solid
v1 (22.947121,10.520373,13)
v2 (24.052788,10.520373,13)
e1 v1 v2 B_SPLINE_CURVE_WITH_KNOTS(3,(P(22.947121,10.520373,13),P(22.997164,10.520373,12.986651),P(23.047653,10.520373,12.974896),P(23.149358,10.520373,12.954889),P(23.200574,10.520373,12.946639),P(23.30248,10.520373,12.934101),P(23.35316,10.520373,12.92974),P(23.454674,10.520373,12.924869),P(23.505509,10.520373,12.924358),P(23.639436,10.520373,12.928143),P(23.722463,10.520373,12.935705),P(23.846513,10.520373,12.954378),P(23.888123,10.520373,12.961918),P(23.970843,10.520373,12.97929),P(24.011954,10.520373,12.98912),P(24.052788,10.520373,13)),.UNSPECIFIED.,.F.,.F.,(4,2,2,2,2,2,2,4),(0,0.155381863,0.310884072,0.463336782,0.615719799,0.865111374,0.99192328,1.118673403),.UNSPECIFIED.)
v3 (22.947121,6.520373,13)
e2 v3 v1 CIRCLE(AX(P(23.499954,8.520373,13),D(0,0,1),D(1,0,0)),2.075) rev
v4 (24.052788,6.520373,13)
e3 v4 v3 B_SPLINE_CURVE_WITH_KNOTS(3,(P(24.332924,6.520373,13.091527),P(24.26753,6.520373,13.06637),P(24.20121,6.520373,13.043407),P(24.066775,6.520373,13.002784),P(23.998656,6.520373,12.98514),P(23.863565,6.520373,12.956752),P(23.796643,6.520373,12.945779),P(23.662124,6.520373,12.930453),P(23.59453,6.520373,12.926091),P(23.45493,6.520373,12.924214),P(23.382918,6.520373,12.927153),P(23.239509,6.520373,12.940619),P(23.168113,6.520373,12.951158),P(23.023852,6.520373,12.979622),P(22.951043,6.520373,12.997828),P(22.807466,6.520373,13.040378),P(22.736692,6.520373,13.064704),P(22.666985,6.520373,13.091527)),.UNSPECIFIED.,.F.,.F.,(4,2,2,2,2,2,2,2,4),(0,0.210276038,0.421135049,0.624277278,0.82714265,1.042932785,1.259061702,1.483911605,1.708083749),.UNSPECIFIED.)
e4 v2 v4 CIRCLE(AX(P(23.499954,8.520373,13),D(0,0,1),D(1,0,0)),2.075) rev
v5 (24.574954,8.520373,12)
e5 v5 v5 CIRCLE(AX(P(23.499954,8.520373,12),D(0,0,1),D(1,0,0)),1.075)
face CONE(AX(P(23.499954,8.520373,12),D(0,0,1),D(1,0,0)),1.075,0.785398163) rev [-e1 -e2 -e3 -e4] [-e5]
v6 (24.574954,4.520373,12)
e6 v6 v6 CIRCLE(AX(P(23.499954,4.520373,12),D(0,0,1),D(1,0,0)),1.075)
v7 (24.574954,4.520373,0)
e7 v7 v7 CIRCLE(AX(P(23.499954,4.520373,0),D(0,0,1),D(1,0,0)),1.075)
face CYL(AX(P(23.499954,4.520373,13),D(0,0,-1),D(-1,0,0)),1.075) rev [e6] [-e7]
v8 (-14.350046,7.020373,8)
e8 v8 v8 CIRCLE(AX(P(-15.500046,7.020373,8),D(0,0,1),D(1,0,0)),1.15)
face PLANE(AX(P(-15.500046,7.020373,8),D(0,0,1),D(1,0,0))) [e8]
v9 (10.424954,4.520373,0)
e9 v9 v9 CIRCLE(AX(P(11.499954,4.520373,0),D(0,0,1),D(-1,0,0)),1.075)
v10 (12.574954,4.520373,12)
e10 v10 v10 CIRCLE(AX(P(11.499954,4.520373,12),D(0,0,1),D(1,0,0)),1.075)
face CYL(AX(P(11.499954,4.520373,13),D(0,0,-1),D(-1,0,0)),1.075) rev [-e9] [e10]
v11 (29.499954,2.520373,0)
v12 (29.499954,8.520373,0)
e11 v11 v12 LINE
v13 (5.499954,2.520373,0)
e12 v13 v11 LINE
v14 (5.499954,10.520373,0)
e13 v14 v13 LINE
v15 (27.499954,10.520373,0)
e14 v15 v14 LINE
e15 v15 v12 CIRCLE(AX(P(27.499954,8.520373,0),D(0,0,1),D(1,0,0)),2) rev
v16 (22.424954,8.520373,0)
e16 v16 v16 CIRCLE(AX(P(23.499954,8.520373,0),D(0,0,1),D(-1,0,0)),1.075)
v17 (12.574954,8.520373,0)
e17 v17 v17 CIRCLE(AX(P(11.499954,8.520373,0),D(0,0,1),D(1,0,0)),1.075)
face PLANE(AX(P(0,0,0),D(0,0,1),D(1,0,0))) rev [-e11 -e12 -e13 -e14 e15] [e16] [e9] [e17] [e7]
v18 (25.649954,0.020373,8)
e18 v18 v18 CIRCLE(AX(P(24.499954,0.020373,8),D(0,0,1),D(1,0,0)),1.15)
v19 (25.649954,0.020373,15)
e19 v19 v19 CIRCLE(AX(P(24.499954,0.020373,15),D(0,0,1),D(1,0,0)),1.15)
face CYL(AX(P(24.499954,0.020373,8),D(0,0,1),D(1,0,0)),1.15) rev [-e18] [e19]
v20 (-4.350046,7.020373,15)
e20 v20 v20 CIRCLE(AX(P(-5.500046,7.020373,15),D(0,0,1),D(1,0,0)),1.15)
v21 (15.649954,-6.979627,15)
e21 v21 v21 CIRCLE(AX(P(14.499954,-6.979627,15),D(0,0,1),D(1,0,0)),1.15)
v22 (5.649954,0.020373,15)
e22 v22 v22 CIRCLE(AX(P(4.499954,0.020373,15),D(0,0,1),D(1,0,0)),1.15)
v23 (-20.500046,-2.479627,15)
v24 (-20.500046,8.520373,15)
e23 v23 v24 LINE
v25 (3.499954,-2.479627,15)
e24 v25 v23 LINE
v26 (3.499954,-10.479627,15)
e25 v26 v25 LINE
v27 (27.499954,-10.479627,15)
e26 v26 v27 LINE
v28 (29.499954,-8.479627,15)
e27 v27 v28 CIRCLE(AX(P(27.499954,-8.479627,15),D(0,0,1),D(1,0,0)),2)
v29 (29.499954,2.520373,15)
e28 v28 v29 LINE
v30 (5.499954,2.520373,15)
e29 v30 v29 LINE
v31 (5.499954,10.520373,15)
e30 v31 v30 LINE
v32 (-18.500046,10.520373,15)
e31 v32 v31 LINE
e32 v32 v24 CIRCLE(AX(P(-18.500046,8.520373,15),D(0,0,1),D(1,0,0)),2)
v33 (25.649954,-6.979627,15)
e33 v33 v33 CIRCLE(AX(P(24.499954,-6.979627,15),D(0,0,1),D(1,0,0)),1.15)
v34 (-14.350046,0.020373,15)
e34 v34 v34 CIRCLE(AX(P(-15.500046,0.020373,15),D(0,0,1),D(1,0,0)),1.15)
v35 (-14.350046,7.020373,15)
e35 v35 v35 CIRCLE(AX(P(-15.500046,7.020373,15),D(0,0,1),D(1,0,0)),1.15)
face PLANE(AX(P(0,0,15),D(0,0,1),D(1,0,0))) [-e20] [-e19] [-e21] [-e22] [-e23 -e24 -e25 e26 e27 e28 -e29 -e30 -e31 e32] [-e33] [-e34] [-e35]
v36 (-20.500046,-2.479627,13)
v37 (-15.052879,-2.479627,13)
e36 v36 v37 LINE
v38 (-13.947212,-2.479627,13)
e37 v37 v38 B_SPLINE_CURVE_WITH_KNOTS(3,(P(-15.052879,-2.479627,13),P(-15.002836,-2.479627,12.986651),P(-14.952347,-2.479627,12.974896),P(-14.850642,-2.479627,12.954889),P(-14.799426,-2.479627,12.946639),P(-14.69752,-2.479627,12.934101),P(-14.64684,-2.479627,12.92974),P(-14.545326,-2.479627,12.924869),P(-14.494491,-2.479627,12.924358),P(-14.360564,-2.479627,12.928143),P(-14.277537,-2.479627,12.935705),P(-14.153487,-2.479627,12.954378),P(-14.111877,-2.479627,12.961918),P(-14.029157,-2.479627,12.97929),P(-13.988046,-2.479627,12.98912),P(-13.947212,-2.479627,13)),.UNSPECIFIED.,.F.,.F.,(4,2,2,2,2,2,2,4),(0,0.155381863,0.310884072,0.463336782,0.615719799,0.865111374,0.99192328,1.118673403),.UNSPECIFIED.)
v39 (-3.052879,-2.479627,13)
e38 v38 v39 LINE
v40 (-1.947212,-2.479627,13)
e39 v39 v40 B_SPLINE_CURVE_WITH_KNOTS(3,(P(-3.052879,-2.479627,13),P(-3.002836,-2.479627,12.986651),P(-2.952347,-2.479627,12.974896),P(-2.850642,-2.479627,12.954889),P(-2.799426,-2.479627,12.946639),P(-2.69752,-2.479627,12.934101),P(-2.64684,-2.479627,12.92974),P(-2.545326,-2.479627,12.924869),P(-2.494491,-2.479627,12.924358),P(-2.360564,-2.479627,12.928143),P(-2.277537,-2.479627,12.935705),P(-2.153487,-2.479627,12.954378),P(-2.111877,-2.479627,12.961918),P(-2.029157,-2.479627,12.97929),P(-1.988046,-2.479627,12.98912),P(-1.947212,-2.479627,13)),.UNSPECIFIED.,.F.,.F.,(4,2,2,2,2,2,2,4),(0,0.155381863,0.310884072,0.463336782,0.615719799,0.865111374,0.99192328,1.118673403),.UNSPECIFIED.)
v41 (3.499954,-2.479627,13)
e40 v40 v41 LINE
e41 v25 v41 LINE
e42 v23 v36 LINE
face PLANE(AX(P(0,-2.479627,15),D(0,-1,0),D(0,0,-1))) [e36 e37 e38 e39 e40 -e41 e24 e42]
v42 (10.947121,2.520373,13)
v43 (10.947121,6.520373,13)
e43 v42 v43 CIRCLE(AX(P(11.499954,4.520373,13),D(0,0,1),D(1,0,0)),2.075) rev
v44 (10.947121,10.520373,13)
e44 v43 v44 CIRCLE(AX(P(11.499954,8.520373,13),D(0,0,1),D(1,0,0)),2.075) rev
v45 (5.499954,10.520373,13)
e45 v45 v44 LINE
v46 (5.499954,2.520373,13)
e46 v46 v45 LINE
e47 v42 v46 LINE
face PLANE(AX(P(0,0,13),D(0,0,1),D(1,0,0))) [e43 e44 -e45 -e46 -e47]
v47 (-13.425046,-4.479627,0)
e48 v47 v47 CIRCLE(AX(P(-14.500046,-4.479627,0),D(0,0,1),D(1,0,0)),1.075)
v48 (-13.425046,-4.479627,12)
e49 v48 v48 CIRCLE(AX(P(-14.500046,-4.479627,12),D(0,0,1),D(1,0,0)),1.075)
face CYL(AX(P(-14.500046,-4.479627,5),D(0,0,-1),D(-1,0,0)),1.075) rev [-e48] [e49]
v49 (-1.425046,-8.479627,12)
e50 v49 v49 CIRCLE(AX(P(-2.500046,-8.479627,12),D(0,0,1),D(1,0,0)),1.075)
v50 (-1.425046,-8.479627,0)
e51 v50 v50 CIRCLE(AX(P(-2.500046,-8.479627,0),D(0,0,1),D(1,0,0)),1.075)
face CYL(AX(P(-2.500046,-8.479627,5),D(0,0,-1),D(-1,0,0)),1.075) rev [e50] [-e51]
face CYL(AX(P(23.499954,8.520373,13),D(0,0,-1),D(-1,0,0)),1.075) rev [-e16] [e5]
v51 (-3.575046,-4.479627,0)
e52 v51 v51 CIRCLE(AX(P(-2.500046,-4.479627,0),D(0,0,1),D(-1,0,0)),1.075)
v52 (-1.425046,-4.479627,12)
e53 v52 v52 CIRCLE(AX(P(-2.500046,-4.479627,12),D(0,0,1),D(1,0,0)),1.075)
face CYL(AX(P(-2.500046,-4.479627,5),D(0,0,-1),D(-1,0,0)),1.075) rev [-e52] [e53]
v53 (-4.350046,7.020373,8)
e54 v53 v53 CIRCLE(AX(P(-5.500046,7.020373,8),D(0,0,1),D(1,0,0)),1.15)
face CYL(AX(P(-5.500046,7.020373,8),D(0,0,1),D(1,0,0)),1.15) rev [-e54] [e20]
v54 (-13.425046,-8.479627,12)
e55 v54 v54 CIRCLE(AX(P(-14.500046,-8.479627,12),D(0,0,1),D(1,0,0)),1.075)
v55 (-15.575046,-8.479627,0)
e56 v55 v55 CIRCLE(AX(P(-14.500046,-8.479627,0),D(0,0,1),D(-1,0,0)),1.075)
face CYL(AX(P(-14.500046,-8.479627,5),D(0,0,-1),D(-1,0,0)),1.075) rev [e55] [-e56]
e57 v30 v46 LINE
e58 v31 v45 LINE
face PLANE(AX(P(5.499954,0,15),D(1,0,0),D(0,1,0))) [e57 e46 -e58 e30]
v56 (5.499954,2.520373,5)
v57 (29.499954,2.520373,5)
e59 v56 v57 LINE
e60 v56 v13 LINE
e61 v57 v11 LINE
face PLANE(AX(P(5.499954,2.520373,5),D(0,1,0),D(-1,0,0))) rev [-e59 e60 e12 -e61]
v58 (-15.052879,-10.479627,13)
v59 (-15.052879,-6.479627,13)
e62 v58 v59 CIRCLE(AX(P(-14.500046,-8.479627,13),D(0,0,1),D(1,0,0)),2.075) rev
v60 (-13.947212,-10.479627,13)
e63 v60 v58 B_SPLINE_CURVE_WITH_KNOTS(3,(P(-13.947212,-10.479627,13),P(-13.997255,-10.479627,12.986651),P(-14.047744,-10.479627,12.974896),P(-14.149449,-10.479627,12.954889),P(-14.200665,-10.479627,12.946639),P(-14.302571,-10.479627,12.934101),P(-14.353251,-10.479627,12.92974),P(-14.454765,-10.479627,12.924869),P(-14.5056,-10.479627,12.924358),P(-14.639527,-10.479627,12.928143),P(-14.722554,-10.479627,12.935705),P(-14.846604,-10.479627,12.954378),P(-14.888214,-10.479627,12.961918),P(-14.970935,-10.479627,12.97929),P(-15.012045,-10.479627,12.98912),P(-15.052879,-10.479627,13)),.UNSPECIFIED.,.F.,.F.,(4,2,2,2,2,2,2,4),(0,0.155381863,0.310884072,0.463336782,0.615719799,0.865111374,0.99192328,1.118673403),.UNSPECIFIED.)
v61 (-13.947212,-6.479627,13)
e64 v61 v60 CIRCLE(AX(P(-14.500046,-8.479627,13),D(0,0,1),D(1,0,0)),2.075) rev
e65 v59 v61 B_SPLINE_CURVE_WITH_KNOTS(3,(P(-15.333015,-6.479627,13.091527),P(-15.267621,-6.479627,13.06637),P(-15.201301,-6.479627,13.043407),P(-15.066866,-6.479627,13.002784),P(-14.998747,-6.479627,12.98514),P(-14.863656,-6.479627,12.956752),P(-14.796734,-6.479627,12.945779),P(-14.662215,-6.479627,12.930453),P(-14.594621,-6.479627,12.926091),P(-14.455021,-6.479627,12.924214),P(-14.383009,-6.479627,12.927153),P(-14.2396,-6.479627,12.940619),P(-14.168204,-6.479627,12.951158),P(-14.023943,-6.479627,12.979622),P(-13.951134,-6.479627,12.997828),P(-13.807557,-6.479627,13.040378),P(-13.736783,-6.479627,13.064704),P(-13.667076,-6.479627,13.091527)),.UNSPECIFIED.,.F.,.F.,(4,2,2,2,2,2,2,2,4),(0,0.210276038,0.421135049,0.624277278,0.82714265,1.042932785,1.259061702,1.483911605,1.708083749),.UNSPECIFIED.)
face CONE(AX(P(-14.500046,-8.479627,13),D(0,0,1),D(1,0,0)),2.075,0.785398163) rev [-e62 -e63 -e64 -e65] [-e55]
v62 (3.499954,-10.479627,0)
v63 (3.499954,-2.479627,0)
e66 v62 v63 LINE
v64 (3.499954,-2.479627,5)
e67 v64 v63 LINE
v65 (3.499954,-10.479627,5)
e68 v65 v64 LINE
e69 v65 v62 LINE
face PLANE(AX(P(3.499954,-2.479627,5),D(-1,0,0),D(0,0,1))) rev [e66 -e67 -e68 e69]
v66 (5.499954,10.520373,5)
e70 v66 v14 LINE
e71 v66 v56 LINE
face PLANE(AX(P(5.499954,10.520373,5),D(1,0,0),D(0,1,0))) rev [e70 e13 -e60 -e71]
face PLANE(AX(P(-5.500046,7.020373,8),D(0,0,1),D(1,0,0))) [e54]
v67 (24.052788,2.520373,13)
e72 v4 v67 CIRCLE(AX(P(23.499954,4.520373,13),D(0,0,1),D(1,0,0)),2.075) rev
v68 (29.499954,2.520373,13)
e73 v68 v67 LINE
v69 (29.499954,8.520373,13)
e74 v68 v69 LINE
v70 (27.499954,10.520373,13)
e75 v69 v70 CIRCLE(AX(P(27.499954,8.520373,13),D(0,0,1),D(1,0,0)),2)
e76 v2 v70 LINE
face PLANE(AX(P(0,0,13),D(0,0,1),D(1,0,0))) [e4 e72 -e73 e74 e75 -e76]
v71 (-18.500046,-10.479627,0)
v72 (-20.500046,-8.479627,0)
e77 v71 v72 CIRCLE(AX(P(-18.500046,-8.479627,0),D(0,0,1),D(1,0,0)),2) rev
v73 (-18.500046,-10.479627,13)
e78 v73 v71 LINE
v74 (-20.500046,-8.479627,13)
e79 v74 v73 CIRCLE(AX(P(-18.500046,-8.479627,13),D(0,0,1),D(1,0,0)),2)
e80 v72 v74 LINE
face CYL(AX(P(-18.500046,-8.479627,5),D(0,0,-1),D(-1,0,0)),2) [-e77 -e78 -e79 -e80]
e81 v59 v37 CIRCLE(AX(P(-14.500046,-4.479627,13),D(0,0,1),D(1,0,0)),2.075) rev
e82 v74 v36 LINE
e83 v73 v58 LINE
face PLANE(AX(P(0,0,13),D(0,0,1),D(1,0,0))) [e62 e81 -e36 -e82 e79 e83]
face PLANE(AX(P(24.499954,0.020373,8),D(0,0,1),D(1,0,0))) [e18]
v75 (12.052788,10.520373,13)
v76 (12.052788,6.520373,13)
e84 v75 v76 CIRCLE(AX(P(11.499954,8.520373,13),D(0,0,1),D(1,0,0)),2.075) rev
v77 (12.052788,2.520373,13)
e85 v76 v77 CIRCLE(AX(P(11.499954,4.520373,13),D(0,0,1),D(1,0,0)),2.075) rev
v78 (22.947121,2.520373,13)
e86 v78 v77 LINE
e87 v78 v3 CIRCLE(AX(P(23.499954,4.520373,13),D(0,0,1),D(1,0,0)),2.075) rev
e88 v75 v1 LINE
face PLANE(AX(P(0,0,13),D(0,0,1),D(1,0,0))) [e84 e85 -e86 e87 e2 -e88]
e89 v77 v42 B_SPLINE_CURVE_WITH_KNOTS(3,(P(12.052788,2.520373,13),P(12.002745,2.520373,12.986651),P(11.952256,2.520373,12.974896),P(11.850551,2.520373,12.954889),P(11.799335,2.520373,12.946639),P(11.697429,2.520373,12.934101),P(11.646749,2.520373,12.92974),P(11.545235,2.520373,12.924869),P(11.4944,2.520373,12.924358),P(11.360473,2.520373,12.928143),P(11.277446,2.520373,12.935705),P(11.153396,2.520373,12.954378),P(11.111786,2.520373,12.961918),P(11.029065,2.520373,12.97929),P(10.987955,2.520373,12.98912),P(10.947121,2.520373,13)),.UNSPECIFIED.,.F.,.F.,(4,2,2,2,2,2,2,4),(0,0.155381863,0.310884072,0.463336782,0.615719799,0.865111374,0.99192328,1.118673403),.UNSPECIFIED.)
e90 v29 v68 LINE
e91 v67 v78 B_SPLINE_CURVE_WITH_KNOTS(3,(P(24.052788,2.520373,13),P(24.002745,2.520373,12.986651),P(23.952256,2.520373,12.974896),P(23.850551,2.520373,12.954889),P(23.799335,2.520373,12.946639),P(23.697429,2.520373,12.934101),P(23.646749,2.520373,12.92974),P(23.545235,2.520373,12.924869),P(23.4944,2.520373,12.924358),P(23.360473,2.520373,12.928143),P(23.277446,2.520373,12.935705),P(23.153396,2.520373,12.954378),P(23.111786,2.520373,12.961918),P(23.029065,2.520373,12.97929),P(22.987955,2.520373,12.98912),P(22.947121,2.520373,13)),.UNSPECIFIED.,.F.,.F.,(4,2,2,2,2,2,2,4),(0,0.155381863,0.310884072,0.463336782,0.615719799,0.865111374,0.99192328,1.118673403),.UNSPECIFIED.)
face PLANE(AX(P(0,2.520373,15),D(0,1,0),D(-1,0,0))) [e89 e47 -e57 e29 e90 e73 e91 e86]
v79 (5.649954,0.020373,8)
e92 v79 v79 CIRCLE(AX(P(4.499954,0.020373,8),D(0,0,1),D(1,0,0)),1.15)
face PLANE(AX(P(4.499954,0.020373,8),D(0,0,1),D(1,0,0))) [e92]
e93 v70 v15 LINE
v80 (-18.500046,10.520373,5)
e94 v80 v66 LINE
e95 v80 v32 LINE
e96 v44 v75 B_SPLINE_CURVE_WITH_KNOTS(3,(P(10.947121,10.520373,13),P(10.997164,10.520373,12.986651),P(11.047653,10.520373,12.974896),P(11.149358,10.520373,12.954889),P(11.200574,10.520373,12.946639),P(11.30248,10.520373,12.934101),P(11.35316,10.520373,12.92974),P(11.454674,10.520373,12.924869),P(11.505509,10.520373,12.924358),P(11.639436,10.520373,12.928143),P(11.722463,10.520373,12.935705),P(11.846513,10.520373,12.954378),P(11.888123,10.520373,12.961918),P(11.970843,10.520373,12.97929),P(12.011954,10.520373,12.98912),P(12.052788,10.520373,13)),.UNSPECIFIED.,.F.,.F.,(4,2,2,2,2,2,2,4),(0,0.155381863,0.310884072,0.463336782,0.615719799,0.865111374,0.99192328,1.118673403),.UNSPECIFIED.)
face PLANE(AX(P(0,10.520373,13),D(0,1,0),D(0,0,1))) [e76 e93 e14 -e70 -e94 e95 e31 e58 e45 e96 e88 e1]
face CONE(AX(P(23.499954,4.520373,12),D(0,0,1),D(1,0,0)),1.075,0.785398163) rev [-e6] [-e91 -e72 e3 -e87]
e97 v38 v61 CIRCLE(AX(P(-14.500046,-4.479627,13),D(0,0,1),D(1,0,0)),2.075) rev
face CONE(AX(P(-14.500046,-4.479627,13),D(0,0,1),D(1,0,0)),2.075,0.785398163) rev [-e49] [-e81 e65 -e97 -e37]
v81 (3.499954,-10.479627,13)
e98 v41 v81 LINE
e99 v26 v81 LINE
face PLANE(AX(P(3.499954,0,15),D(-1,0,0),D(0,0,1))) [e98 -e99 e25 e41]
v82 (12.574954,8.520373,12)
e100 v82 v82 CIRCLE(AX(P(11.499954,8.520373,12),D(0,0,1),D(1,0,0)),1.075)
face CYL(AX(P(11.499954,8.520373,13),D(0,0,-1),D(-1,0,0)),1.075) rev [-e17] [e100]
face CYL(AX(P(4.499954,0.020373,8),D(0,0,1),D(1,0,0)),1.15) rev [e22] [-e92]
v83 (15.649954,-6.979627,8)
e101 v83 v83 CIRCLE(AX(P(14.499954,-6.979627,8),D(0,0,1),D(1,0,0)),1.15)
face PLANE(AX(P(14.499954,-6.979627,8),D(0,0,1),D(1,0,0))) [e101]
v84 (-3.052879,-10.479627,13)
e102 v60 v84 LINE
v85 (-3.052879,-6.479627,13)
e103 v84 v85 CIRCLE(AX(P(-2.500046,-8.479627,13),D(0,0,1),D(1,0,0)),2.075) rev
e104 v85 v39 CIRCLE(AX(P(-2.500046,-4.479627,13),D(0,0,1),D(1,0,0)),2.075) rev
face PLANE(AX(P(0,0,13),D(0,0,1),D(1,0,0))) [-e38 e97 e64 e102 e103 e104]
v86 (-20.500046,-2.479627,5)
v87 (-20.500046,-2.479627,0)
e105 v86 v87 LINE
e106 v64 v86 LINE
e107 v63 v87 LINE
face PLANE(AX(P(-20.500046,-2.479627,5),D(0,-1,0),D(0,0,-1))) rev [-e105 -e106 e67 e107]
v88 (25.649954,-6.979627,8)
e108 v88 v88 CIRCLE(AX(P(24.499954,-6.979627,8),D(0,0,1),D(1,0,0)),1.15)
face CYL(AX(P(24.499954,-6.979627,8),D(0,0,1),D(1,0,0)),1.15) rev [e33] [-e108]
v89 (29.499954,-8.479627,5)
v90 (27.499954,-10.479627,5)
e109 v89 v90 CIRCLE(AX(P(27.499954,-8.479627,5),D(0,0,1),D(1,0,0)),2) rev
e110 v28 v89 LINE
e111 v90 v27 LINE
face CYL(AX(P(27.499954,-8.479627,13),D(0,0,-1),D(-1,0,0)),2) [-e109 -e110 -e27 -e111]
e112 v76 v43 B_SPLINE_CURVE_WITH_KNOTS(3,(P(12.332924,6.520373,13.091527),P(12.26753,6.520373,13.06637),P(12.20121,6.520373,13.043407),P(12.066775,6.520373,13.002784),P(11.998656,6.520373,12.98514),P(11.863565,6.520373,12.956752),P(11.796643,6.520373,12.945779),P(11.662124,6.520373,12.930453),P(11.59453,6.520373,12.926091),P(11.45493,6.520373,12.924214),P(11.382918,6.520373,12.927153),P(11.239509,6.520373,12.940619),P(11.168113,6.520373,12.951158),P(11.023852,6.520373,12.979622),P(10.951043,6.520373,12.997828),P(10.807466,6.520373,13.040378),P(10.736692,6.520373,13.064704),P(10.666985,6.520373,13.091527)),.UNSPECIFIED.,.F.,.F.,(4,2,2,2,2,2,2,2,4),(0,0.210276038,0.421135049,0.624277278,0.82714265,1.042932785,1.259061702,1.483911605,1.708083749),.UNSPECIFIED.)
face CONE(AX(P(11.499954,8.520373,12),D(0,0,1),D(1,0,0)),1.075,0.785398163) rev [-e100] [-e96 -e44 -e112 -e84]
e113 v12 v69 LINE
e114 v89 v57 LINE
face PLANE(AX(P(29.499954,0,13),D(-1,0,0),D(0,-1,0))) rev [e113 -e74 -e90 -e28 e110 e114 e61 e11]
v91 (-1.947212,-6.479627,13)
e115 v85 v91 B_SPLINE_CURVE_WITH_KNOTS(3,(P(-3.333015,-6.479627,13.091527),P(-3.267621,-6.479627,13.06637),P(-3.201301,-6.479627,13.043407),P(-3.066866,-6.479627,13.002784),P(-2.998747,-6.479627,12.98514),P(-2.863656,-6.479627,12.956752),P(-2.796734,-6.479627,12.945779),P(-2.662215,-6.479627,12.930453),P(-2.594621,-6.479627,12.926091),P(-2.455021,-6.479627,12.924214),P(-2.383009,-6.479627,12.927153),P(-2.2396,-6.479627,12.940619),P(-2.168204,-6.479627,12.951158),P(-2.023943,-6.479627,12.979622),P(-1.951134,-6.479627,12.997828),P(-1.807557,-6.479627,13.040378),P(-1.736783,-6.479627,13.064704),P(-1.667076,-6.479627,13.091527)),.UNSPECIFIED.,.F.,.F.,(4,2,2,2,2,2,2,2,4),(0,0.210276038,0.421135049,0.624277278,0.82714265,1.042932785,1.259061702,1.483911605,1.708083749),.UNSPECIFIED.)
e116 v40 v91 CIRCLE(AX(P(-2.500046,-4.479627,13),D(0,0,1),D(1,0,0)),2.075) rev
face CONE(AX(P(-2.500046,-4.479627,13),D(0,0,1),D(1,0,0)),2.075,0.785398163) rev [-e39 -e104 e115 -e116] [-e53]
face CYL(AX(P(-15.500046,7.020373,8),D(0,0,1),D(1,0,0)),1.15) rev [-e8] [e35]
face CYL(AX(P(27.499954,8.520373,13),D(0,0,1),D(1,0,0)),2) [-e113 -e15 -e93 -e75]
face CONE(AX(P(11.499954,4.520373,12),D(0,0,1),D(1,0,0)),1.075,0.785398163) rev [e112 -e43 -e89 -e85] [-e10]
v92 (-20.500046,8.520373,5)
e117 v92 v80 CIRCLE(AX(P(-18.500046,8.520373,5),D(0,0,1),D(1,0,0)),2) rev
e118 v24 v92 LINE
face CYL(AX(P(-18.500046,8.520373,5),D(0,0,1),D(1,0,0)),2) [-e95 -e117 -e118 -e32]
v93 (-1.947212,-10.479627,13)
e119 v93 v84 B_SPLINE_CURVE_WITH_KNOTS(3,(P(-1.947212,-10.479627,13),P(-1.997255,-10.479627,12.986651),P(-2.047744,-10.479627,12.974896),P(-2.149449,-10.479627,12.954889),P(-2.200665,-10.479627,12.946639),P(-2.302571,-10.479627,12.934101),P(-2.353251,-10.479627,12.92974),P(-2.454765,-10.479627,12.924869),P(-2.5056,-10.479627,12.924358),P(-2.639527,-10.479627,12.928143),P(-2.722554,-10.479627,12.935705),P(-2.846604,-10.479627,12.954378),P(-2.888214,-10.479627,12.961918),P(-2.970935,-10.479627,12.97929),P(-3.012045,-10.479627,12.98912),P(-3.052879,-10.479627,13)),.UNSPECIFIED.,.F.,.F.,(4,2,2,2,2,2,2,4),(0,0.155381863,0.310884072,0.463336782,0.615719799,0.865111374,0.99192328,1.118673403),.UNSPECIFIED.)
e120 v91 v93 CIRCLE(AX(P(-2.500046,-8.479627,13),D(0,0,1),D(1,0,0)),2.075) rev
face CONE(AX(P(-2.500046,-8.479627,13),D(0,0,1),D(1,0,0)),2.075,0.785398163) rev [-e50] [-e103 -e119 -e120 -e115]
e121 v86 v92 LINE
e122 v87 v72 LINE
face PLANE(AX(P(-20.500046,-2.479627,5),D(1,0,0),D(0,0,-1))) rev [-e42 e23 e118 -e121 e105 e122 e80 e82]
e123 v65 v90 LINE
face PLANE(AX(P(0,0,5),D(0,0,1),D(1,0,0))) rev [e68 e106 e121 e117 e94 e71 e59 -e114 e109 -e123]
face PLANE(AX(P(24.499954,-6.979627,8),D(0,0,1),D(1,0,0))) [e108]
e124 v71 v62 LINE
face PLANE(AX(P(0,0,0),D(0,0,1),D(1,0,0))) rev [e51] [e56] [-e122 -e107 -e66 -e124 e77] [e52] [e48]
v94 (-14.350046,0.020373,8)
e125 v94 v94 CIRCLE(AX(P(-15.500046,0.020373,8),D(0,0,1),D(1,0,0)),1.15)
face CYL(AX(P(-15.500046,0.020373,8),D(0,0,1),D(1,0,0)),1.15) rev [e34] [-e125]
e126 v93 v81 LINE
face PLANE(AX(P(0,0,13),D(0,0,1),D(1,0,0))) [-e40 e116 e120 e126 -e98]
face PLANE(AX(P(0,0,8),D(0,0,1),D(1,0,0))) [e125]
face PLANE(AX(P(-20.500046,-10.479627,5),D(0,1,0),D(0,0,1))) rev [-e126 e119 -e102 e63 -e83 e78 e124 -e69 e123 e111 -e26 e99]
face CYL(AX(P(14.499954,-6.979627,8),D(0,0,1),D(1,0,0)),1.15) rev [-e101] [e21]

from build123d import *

# Parameters (mm, degrees)
SKETCH1_W             = 24
SKETCH1_H             = 8
SKETCH1_R             = 1.075
BOSS_EXTRUDE1_DEPTH   = 5
BOSS_EXTRUDE1_2_DEPTH = 5
SKETCH2_W             = 50
SKETCH2_H             = 21
SKETCH2_R             = 1.075
BOSS_EXTRUDE2_DEPTH   = 8
BOSS_EXTRUDE3_DEPTH   = 10
CHAMFER1_SIZE         = 1
FILLET1_R             = 2
SKETCH3_R             = 1.15
CUT_EXTRUDE1_DEPTH    = 7


with BuildPart() as part:
    # Sketch1 → Boss-Extrude1 (new body)
    with BuildSketch(Plane.XY):
        with Locations((-8.500045519, -6.479626746)):
            Rectangle(SKETCH1_W, SKETCH1_H)
        with Locations((-14.500045519, -4.479626746)):
            Circle(SKETCH1_R, mode=Mode.SUBTRACT)
        with Locations((-2.500045519, -8.479626746)):
            Circle(SKETCH1_R, mode=Mode.SUBTRACT)
        with Locations(Location((-14.500045519, -8.479626746, 0), (0, 0, 180))):
            Circle(SKETCH1_R, mode=Mode.SUBTRACT)
        with Locations(Location((-2.500045519, -4.479626746, 0), (0, 0, 180))):
            Circle(SKETCH1_R, mode=Mode.SUBTRACT)
    extrude(amount=BOSS_EXTRUDE1_DEPTH)



with BuildPart() as body_2:
    # Sketch1 → Boss-Extrude1 2 (new body)
    with BuildSketch(Plane.XY):
        with Locations((17.499954481, 6.520373254)):
            Rectangle(SKETCH1_W, SKETCH1_H)
        with Locations((11.499954481, 8.520373254)):
            Circle(SKETCH1_R, mode=Mode.SUBTRACT)
        with Locations(Location((11.499954481, 4.520373254, 0), (0, 0, 180))):
            Circle(SKETCH1_R, mode=Mode.SUBTRACT)
        with Locations((23.499954481, 4.520373254)):
            Circle(SKETCH1_R, mode=Mode.SUBTRACT)
        with Locations(Location((23.499954481, 8.520373254, 0), (0, 0, 180))):
            Circle(SKETCH1_R, mode=Mode.SUBTRACT)
    extrude(amount=BOSS_EXTRUDE1_2_DEPTH)


with BuildPart() as part_1:
    add(part.part)

    add(body_2.part)  # Boss-Extrude2 merges body 2
    # Sketch2 → Boss-Extrude2 (add)
    with BuildSketch(Plane.XY.offset(5)):
        with Locations((4.499954481, 0.020373254)):
            Rectangle(SKETCH2_W, SKETCH2_H)
        with Locations((-14.500045519, -8.479626746)):
            Circle(SKETCH2_R, mode=Mode.SUBTRACT)
        with Locations((-2.500045519, -8.479626746)):
            Circle(SKETCH2_R, mode=Mode.SUBTRACT)
        with Locations((-14.500045519, -4.479626746)):
            Circle(SKETCH2_R, mode=Mode.SUBTRACT)
        with Locations((-2.500045519, -4.479626746)):
            Circle(SKETCH2_R, mode=Mode.SUBTRACT)
        with Locations((23.499954481, 8.520373254)):
            Circle(SKETCH2_R, mode=Mode.SUBTRACT)
        with Locations((11.499954481, 8.520373254)):
            Circle(SKETCH2_R, mode=Mode.SUBTRACT)
        with Locations((11.499954481, 4.520373254)):
            Circle(SKETCH2_R, mode=Mode.SUBTRACT)
        with Locations((23.499954481, 4.520373254)):
            Circle(SKETCH2_R, mode=Mode.SUBTRACT)
    extrude(amount=BOSS_EXTRUDE2_DEPTH)

    # Sketch2<6> → Boss-Extrude3 (add)
    with BuildSketch(Plane.XY.offset(5)):
        Polygon((3.499954481, -2.479626746), (3.499954481, -10.479626746), (29.499954481, -10.479626746), (29.499954481, 2.520373254), (5.499954481, 2.520373254), (5.499954481, 10.520373254), (-20.500045519, 10.520373254), (-20.500045519, -2.479626746), align=None)
    extrude(amount=BOSS_EXTRUDE3_DEPTH)

    # Chamfer1
    # the kernel refuses this chamfer: 1 mm, written as the material it takes off along each edge
    with BuildSketch(Plane(origin=(23.499954481, 8.520373254, 13), x_dir=(1, 0, 0), z_dir=(0, -1, 0))) as chamfer1_piece_1:
        Polygon((1.075 + CHAMFER1_SIZE, 0), (1.075, -CHAMFER1_SIZE), (1.075, 0), align=None)
    revolve(axis=Axis((23.499954481, 8.520373254, 13), (0, 0, 1)), mode=Mode.SUBTRACT)
    with BuildSketch(Plane(origin=(11.499954481, 4.520373254, 13), x_dir=(1, 0, 0), z_dir=(0, -1, 0))) as chamfer1_piece_2_section:
        Polygon((1.075 + CHAMFER1_SIZE, 0), (1.075, -CHAMFER1_SIZE), (1.075, 0), align=None)
    chamfer1_piece_2 = revolve(axis=Axis((11.499954481, 4.520373254, 13), (0, 0, 1)), mode=Mode.PRIVATE)
    chamfer1_piece_2 = split(chamfer1_piece_2, bisect_by=Plane(origin=(9.93692483, 2.520373254, 12.511970349), z_dir=(0, 1, 0)), keep=Keep.TOP, mode=Mode.PRIVATE)
    add(chamfer1_piece_2, mode=Mode.SUBTRACT)
    with BuildSketch(Plane(origin=(11.499954481, 8.520373254, 13), x_dir=(1, 0, 0), z_dir=(0, -1, 0))) as chamfer1_piece_3:
        Polygon((1.075 + CHAMFER1_SIZE, 0), (1.075, -CHAMFER1_SIZE), (1.075, 0), align=None)
    revolve(axis=Axis((11.499954481, 8.520373254, 13), (0, 0, 1)), mode=Mode.SUBTRACT)
    with BuildSketch(Plane(origin=(23.499954481, 4.520373254, 13), x_dir=(1, 0, 0), z_dir=(0, -1, 0))) as chamfer1_piece_4_section:
        Polygon((1.075 + CHAMFER1_SIZE, 0), (1.075, -CHAMFER1_SIZE), (1.075, 0), align=None)
    chamfer1_piece_4 = revolve(axis=Axis((23.499954481, 4.520373254, 13), (0, 0, 1)), mode=Mode.PRIVATE)
    chamfer1_piece_4 = split(chamfer1_piece_4, bisect_by=Plane(origin=(21.93692483, 2.520373254, 12.511970349), z_dir=(0, 1, 0)), keep=Keep.TOP, mode=Mode.PRIVATE)
    add(chamfer1_piece_4, mode=Mode.SUBTRACT)
    with BuildSketch(Plane(origin=(-14.500045519, -4.479626746, 13), x_dir=(1, 0, 0), z_dir=(0, -1, 0))) as chamfer1_piece_5_section:
        Polygon((1.075 + CHAMFER1_SIZE, 0), (1.075, -CHAMFER1_SIZE), (1.075, 0), align=None)
    chamfer1_piece_5 = revolve(axis=Axis((-14.500045519, -4.479626746, 13), (0, 0, 1)), mode=Mode.PRIVATE)
    chamfer1_piece_5 = split(chamfer1_piece_5, bisect_by=Plane(origin=(-16.063075173, -2.479626746, 12.511970346), z_dir=(0, -1, 0)), keep=Keep.TOP, mode=Mode.PRIVATE)
    add(chamfer1_piece_5, mode=Mode.SUBTRACT)
    with BuildSketch(Plane(origin=(-14.500045519, -8.479626746, 13), x_dir=(1, 0, 0), z_dir=(0, -1, 0))) as chamfer1_piece_6:
        Polygon((1.075 + CHAMFER1_SIZE, 0), (1.075, -CHAMFER1_SIZE), (1.075, 0), align=None)
    revolve(axis=Axis((-14.500045519, -8.479626746, 13), (0, 0, 1)), mode=Mode.SUBTRACT)
    with BuildSketch(Plane(origin=(-2.500045519, -4.479626746, 13), x_dir=(1, 0, 0), z_dir=(0, -1, 0))) as chamfer1_piece_7_section:
        Polygon((1.075 + CHAMFER1_SIZE, 0), (1.075, -CHAMFER1_SIZE), (1.075, 0), align=None)
    chamfer1_piece_7 = revolve(axis=Axis((-2.500045519, -4.479626746, 13), (0, 0, 1)), mode=Mode.PRIVATE)
    chamfer1_piece_7 = split(chamfer1_piece_7, bisect_by=Plane(origin=(-4.063075173, -2.479626746, 12.511970346), z_dir=(0, -1, 0)), keep=Keep.TOP, mode=Mode.PRIVATE)
    add(chamfer1_piece_7, mode=Mode.SUBTRACT)
    with BuildSketch(Plane(origin=(-2.500045519, -8.479626746, 13), x_dir=(1, 0, 0), z_dir=(0, -1, 0))) as chamfer1_piece_8:
        Polygon((1.075 + CHAMFER1_SIZE, 0), (1.075, -CHAMFER1_SIZE), (1.075, 0), align=None)
    revolve(axis=Axis((-2.500045519, -8.479626746, 13), (0, 0, 1)), mode=Mode.SUBTRACT)

    # Fillet1
    fillet1_edges = [part_1.edges().sort_by_distance(p)[0] for p in [
        (29.499954481, -10.479626746, 9),
        (29.499954481, 10.520373254, 9),
        (-20.500045519, 10.520373254, 10),
        (-20.500045519, -10.479626746, 6.5),
    ]]
    fillet(fillet1_edges, radius=FILLET1_R)

    # Sketch3 → Cut-Extrude1 (cut)
    with BuildSketch(Plane.XY.offset(15)):
        with Locations((4.499954481, 0.020373254)):
            Circle(SKETCH3_R)
        with Locations((24.499954481, 0.020373254)):
            Circle(SKETCH3_R)
        with Locations((-15.500045519, 0.020373254)):
            Circle(SKETCH3_R)
        with Locations((-15.500045519, 7.020373254)):
            Circle(SKETCH3_R)
        with Locations((-5.500045519, 7.020373254)):
            Circle(SKETCH3_R)
        with Locations((14.499954481, -6.979626746)):
            Circle(SKETCH3_R)
        with Locations((24.499954481, -6.979626746)):
            Circle(SKETCH3_R)
    extrude(amount=-CUT_EXTRUDE1_DEPTH, mode=Mode.SUBTRACT)


solid = part_1.part
